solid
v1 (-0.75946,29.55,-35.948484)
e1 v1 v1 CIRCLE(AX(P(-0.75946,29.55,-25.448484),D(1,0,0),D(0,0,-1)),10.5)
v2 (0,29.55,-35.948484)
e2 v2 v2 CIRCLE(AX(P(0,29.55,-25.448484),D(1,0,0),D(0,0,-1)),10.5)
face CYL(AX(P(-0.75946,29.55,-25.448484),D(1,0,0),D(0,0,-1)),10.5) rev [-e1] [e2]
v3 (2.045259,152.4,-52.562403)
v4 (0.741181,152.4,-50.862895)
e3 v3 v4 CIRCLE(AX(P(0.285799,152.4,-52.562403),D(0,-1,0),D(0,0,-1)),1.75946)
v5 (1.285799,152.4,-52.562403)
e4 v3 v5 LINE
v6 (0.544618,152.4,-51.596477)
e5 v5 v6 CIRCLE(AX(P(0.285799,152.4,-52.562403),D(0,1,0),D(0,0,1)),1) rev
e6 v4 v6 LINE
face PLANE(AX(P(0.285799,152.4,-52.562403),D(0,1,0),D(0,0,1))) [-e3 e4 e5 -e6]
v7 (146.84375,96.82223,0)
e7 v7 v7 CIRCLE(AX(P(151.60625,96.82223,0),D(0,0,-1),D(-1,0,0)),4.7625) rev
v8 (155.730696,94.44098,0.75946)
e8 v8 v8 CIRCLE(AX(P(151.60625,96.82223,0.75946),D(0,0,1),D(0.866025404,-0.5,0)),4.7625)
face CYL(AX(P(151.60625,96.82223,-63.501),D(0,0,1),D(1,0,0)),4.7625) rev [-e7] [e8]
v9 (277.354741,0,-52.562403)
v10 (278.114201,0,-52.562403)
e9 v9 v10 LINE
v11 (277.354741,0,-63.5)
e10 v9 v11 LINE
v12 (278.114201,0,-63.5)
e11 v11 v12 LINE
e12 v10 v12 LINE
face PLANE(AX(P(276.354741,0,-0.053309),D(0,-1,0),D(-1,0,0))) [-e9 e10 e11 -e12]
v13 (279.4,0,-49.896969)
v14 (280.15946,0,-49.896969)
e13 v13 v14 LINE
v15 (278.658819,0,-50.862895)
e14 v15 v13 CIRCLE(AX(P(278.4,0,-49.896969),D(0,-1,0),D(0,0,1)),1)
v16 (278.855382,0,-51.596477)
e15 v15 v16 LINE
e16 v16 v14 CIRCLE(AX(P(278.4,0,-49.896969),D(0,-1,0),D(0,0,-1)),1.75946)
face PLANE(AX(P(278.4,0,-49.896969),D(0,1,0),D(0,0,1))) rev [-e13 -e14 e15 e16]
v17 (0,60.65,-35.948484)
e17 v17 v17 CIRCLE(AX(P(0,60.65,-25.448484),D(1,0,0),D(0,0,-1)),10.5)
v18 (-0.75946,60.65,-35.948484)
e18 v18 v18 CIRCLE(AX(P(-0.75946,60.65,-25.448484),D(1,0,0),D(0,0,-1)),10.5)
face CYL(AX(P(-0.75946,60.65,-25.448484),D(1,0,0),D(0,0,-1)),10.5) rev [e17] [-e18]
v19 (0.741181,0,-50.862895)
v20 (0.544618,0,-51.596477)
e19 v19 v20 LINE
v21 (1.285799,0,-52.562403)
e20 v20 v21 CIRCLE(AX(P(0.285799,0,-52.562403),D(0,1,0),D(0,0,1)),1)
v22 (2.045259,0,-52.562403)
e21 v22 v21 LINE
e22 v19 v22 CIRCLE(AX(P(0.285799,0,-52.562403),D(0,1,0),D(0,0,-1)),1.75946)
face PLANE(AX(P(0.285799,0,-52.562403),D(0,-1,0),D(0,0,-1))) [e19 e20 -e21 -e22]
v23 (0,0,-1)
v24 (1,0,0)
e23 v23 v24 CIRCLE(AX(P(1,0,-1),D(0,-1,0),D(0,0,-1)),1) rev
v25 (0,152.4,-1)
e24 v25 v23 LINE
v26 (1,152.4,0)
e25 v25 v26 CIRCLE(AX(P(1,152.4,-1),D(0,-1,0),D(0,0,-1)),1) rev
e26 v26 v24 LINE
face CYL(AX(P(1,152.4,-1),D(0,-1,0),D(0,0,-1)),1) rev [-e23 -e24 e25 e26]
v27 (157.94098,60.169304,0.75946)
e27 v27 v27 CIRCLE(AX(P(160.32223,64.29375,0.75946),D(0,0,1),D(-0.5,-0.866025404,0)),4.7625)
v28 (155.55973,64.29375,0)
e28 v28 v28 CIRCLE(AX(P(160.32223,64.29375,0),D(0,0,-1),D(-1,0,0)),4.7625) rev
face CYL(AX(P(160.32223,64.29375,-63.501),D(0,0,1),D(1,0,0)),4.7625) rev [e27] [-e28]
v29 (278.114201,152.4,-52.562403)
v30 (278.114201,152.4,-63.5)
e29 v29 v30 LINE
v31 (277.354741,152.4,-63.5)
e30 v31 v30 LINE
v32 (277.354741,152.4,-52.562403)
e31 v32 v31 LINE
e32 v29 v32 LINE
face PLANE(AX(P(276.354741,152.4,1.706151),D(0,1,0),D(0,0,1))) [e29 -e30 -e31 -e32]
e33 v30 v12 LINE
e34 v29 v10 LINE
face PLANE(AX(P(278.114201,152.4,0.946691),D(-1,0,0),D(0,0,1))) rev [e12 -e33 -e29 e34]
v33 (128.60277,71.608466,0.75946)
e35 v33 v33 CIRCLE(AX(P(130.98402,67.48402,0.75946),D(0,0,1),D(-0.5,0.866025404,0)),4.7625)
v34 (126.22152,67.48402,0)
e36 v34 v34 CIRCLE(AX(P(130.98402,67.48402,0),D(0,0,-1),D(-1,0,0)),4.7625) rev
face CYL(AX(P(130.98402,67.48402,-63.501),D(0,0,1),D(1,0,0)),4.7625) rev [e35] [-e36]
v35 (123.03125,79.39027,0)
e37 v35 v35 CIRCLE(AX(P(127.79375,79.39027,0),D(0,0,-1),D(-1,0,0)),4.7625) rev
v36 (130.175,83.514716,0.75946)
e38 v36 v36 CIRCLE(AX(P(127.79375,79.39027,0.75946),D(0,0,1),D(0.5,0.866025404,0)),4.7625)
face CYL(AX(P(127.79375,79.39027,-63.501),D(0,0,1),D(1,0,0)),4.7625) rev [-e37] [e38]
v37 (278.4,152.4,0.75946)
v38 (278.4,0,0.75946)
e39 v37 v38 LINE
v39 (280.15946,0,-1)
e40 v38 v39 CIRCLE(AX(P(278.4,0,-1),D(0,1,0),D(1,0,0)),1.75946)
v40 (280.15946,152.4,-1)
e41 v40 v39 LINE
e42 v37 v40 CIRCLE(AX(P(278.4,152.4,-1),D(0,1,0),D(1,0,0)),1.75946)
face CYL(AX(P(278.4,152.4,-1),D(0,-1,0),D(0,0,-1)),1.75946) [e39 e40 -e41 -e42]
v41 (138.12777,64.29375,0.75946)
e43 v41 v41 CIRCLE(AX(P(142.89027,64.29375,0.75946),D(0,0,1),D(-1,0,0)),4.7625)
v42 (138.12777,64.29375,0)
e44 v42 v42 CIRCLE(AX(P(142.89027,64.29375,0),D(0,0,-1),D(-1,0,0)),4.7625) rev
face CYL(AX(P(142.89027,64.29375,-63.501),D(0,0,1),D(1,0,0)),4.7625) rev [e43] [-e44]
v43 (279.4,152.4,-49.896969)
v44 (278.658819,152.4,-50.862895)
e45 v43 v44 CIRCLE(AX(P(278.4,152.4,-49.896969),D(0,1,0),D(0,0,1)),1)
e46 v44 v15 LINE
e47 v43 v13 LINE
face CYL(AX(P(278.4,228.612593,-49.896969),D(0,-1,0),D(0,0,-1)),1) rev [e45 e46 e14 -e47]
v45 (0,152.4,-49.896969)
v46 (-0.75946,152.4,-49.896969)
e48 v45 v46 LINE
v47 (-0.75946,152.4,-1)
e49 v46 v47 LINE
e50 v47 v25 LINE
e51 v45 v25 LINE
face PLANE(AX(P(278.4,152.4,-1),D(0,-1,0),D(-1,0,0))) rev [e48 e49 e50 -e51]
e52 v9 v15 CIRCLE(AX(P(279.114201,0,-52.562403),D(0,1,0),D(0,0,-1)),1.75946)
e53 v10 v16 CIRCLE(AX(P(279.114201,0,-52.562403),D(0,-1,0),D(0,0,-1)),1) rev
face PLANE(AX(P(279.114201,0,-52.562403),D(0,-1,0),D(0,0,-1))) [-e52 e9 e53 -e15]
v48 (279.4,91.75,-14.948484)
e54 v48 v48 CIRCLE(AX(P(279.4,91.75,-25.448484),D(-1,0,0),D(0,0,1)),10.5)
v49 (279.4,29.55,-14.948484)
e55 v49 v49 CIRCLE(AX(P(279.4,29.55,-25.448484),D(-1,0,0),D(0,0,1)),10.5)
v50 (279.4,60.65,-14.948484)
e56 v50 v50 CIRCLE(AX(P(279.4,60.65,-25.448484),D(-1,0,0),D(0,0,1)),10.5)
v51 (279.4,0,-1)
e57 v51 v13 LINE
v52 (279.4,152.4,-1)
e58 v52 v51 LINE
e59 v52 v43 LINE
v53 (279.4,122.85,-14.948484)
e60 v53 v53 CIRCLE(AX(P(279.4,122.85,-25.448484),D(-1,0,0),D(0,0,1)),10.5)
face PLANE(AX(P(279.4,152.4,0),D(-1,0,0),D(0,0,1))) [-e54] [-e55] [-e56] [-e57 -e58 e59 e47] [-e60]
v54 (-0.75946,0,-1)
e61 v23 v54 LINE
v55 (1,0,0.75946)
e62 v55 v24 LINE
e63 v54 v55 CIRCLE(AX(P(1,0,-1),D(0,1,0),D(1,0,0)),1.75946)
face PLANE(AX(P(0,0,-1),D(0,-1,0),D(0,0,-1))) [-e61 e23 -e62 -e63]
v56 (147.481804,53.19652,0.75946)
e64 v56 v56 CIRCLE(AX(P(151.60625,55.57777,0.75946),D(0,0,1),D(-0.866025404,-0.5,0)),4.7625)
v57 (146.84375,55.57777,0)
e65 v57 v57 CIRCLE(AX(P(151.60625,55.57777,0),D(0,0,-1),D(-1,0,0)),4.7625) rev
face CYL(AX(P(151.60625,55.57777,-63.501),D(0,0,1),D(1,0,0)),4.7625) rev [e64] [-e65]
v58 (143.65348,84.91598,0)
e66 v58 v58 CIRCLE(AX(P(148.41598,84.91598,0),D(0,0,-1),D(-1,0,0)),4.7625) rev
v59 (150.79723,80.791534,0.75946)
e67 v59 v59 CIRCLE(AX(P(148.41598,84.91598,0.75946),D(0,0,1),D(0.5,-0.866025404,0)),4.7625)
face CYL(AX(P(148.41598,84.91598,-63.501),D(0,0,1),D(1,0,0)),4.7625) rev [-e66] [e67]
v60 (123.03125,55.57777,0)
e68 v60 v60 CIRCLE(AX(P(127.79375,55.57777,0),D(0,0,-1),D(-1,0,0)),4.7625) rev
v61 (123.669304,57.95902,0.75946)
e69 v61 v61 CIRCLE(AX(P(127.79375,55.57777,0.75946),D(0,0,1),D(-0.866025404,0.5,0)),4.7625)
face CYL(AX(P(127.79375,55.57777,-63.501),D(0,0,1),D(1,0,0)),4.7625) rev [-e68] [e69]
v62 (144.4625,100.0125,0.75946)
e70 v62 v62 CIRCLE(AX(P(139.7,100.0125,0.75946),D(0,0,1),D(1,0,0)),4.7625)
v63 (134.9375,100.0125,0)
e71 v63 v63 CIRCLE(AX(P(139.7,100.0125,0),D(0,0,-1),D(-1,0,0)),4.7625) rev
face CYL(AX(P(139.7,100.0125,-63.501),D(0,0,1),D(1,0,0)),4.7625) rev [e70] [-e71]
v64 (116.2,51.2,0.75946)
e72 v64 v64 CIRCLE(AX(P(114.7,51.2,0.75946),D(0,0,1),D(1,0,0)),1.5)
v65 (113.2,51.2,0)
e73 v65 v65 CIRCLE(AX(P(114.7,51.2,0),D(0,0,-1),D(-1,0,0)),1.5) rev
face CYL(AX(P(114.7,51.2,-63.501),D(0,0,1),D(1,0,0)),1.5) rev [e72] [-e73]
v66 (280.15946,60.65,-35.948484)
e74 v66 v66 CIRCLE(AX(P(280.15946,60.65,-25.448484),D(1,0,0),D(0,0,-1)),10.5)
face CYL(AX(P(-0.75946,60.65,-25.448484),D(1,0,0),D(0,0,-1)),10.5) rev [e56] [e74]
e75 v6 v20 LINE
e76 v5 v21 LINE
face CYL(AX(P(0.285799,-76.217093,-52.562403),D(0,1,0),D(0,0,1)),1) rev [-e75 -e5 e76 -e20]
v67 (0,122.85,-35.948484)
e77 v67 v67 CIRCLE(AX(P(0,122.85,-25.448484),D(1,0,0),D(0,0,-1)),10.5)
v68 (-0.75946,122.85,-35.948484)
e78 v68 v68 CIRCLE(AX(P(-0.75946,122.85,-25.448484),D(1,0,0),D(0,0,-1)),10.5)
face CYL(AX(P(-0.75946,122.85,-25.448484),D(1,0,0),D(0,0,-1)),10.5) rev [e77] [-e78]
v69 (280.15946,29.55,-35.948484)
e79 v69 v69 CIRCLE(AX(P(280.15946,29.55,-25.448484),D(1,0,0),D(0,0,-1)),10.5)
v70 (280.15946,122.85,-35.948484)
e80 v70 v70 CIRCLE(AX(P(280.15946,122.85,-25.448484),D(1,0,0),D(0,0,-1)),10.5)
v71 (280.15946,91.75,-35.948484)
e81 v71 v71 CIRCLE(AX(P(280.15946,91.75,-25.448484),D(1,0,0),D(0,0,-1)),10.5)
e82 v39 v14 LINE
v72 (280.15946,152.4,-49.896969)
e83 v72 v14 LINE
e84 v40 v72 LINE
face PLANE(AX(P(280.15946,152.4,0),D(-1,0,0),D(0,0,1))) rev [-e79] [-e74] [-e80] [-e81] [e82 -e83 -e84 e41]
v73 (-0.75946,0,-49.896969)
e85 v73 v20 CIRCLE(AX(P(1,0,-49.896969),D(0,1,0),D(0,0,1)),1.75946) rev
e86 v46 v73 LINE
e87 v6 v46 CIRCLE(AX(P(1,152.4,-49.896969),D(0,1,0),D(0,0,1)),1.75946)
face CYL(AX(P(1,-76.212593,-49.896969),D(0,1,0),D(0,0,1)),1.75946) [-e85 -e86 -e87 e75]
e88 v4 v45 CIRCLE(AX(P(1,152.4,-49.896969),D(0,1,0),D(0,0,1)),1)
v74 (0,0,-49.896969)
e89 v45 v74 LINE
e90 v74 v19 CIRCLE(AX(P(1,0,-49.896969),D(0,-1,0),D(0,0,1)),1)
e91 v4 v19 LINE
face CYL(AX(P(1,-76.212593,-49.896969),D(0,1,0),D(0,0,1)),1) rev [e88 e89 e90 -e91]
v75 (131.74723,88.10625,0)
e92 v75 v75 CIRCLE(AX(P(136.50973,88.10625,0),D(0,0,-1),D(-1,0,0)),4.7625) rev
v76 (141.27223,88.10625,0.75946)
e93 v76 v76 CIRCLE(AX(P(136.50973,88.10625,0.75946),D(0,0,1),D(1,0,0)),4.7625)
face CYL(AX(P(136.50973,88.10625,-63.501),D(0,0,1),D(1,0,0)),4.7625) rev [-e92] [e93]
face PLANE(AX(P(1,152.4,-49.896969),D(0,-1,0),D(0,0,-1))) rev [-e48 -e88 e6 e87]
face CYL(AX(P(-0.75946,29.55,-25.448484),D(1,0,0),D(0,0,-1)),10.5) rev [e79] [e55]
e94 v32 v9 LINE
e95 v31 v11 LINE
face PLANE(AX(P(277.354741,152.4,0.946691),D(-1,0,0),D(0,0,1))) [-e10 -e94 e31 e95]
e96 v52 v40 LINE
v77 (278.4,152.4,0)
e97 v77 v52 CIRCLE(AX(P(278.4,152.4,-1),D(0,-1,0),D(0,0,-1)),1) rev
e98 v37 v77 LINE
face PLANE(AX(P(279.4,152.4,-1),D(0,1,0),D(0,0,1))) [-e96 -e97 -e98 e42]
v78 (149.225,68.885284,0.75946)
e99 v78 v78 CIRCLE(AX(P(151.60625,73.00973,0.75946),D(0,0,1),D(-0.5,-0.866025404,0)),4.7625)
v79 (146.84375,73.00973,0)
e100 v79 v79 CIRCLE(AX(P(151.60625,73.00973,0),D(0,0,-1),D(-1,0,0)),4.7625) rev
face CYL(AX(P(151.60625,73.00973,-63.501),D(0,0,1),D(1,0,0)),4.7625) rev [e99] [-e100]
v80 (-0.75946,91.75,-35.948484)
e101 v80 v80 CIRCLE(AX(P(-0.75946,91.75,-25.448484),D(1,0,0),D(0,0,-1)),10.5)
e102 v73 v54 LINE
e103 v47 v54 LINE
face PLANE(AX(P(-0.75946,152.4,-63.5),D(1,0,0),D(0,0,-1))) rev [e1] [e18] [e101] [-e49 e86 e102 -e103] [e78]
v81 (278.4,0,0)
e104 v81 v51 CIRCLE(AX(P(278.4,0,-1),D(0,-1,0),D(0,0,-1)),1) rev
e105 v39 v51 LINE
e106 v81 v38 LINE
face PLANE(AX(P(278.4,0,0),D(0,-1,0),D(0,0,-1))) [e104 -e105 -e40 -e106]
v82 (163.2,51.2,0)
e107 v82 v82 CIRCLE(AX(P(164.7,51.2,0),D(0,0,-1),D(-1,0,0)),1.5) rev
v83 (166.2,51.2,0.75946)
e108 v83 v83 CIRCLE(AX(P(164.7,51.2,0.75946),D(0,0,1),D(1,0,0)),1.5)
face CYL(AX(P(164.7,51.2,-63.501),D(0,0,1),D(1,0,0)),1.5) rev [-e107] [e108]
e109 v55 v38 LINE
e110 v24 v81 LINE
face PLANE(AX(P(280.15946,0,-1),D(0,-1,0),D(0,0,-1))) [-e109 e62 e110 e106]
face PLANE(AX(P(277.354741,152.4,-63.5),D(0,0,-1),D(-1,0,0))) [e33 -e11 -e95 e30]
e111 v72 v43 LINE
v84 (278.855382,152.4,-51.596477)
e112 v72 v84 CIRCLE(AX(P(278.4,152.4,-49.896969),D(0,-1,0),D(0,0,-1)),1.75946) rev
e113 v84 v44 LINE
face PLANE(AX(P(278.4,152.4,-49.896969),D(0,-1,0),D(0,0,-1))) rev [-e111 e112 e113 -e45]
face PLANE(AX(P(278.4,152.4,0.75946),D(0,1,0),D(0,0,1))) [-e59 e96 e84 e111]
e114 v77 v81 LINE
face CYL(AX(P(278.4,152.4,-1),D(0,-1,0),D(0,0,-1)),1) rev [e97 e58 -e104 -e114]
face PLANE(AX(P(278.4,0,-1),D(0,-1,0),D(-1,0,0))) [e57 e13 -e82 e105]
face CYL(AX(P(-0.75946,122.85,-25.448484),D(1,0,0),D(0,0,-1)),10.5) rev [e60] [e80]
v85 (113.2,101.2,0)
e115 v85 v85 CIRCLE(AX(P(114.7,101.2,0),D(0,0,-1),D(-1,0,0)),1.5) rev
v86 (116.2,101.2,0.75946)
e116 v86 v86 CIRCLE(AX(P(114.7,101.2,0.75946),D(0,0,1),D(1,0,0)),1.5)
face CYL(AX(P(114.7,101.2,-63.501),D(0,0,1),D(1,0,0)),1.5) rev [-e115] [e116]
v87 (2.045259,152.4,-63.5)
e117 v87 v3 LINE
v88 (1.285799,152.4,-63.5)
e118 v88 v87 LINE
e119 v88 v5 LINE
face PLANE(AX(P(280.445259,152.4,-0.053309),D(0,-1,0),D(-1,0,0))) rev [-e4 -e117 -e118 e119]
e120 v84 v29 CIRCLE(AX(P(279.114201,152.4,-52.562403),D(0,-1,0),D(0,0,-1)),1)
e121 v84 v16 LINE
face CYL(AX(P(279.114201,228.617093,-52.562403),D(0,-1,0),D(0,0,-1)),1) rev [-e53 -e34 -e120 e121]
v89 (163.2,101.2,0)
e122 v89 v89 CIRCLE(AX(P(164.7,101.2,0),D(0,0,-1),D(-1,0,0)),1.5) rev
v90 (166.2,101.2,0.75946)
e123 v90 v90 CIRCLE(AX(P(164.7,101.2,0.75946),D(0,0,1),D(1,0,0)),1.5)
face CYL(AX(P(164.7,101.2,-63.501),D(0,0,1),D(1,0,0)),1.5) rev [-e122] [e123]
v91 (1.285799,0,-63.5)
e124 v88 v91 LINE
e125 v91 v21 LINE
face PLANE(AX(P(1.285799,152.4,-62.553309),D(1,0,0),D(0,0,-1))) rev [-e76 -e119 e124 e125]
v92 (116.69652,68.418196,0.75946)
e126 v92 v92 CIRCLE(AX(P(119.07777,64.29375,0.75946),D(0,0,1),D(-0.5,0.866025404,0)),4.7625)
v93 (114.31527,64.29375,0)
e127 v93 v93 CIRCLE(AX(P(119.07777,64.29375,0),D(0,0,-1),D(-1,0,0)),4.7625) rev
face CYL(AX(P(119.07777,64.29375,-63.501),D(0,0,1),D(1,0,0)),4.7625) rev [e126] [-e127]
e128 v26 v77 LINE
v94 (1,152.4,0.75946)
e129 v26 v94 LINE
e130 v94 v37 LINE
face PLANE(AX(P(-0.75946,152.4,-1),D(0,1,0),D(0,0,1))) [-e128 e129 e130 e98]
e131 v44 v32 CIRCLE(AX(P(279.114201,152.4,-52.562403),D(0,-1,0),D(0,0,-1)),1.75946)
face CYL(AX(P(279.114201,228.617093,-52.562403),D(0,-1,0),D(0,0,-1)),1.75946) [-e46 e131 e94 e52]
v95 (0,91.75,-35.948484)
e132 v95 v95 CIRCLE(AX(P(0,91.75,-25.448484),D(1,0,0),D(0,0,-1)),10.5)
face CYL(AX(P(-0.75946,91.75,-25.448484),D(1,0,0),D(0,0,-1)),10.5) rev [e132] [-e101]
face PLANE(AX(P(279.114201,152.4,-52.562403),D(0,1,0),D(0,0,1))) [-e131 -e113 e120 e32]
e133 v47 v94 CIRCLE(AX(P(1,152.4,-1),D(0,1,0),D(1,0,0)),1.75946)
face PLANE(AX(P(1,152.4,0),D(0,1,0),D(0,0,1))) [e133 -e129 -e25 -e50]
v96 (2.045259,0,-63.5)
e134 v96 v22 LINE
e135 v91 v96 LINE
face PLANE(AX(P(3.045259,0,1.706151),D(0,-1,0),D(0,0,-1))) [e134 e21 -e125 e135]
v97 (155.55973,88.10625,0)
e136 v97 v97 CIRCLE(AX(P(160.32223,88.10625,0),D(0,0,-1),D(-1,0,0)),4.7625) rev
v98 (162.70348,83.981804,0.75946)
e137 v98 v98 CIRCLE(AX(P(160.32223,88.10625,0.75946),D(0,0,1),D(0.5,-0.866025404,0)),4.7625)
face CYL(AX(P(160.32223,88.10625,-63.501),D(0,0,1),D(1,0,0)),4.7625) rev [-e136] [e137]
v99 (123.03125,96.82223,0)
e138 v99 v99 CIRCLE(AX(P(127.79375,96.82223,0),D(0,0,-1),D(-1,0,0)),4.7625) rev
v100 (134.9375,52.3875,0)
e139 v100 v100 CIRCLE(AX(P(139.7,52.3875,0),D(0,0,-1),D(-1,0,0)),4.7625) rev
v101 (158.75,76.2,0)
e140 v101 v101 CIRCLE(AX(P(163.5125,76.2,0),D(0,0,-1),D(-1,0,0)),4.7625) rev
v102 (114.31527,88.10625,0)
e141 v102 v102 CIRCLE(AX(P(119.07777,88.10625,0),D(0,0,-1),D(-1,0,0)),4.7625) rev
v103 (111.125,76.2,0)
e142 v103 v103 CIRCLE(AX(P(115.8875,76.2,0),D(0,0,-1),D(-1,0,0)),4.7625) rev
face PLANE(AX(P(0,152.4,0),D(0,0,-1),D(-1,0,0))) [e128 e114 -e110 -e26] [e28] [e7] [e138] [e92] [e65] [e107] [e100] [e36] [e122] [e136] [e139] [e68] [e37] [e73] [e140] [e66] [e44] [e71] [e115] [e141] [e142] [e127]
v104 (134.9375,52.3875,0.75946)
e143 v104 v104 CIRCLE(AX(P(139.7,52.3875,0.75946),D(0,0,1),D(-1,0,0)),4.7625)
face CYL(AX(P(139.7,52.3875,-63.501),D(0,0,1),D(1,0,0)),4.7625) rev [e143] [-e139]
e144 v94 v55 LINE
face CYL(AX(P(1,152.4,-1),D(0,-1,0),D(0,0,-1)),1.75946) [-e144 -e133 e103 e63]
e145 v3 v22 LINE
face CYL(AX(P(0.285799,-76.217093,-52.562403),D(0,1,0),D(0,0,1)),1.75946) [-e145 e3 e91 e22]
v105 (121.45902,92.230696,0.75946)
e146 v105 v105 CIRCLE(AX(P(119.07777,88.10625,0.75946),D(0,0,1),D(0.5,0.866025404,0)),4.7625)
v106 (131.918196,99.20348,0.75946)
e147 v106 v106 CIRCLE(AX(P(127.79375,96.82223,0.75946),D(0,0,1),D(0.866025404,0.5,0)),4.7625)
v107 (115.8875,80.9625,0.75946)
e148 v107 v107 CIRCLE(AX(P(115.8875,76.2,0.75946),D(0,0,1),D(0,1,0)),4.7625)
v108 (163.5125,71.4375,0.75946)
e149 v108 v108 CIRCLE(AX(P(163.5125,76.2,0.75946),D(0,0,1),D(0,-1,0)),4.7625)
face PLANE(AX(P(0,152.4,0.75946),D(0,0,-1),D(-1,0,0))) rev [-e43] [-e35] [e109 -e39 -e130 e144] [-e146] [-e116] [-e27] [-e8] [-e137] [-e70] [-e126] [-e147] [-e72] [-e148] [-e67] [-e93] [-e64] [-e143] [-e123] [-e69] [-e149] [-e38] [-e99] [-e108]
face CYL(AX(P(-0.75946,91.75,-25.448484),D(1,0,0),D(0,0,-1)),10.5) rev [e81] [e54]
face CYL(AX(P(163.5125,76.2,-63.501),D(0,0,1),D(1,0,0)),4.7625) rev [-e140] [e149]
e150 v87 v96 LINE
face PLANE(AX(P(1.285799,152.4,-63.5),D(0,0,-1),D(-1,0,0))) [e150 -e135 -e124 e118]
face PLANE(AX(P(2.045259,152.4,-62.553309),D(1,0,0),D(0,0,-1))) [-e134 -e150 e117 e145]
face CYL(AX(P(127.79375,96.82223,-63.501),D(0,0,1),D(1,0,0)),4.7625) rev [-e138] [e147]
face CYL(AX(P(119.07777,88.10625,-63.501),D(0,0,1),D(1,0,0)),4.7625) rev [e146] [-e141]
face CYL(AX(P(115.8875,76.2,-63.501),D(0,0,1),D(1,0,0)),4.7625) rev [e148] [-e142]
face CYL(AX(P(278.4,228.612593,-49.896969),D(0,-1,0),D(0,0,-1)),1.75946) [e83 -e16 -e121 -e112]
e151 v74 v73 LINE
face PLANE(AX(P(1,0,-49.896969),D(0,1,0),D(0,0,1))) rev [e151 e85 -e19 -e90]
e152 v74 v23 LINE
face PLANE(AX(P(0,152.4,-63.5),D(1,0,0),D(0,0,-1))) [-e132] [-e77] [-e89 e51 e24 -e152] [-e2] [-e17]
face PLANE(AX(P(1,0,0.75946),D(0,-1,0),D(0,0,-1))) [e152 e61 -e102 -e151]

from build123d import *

# Parameters (mm, degrees)
BASE_FLANGE1_DEPTH = 152.4
JOG1_DEPTH         = 152.4
JOG1_2_DEPTH       = 152.4
JOG2_DEPTH         = 152.4
JOG2_2_DEPTH       = 152.4
SKETCH6_R          = 10.5
CUT_EXTRUDE1_DEPTH = 326.842676171
CUT_EXTRUDE4_REACH = 327.337
SKETCH8_R          = 4.7625
CIRPATTERN1_COUNT  = 12
CUT_EXTRUDE5_REACH = 327.337
SKETCH9_R          = 4.7625
CIRPATTERN2_COUNT  = 6
CUT_EXTRUDE6_REACH = 327.337
SKETCH10_R         = 1.5


# Read off the part's stored shape, not the designer's step: Jog1, Jog2
# Sheet-metal steps are written as plain solids
with BuildPart() as part:
    # Sketch1 → Base-Flange1 (new body)
    with BuildSketch(Plane(origin=(0, 0, 0), x_dir=(1, 0, 0), z_dir=(0, 1, 0))):
        with BuildLine():
            Line((0, 63.5), (0, 1))
            ThreePointArc((0, 1), (0.292893219, 0.292893219), (1, 0))
            Line((1, 0), (278.4, 0))
            ThreePointArc((278.4, 0), (279.107106781, 0.292893219), (279.4, 1))
            Line((279.4, 1), (279.4, 63.5))
            Line((279.4, 63.5), (280.15946, 63.5))
            Line((280.15946, 63.5), (280.15946, 1))
            ThreePointArc((280.15946, 1), (279.644126097, -0.244126097), (278.4, -0.75946))
            Line((278.4, -0.75946), (1, -0.75946))
            ThreePointArc((1, -0.75946), (-0.244126097, -0.244126097), (-0.75946, 1))
            Line((-0.75946, 1), (-0.75946, 63.5))
            Line((-0.75946, 63.5), (0, 63.5))
        make_face()
    extrude(amount=BASE_FLANGE1_DEPTH)

    # Jog1 outline → Jog1 (cut)
    with BuildSketch(Plane(origin=(0, 0, 0), x_dir=(1, 0, 0), z_dir=(0, 1, 0))):
        with BuildLine():
            Line((279.4, 63.5), (279.4, 51.344621925))
            ThreePointArc((279.4, 51.344621925), (279.958069237, 50.714354749), (280.15946, 49.896968827))
            Line((280.15946, 49.896968827), (280.15946, 63.5))
            Line((280.15946, 63.5), (279.4, 63.5))
        make_face()
    extrude(amount=JOG1_DEPTH, mode=Mode.SUBTRACT)

    # Jog1 2 outline → Jog1 2 (add)
    with BuildSketch(Plane(origin=(0, 0, 0), x_dir=(1, 0, 0), z_dir=(0, 1, 0))):
        with BuildLine():
            Line((278.114200802, 52.562402507), (278.114200802, 63.5))
            Line((278.114200802, 63.5), (277.354740802, 63.5))
            Line((277.354740802, 63.5), (277.354740802, 52.562402507))
            ThreePointArc((277.354740802, 52.562402507), (277.718327334, 51.491311123), (278.658819045, 50.862894653))
            ThreePointArc((278.658819045, 50.862894653), (279.19335334, 50.505730256), (279.4, 49.896968827))
            Line((279.4, 49.896968827), (279.4, 51.344621925))
            ThreePointArc((279.4, 51.344621925), (279.138506411, 51.493937133), (278.855381757, 51.596476681))
            ThreePointArc((278.855381757, 51.596476681), (278.320847462, 51.953641078), (278.114200802, 52.562402507))
        make_face()
    extrude(amount=JOG1_2_DEPTH)

    # Jog2 outline → Jog2 (cut)
    with BuildSketch(Plane(origin=(0, 0, 0), x_dir=(1, 0, 0), z_dir=(0, 1, 0))):
        with BuildLine():
            ThreePointArc((-0.75946, 49.896968827), (-0.558069237, 50.714354749), (0, 51.344621925))
            Line((0, 51.344621925), (0, 63.5))
            Line((0, 63.5), (-0.75946, 63.5))
            Line((-0.75946, 63.5), (-0.75946, 49.896968827))
        make_face()
    extrude(amount=JOG2_DEPTH, mode=Mode.SUBTRACT)

    # Jog2 2 outline → Jog2 2 (add)
    with BuildSketch(Plane(origin=(0, 0, 0), x_dir=(1, 0, 0), z_dir=(0, 1, 0))):
        with BuildLine():
            Line((2.045259198, 52.562402507), (2.045259198, 63.5))
            Line((2.045259198, 63.5), (1.285799198, 63.5))
            Line((1.285799198, 63.5), (1.285799198, 52.562402507))
            ThreePointArc((1.285799198, 52.562402507), (1.079152538, 51.953641078), (0.544618243, 51.596476681))
            ThreePointArc((0.544618243, 51.596476681), (0.261493589, 51.493937133), (0, 51.344621925))
            Line((0, 51.344621925), (0, 49.896968827))
            ThreePointArc((0, 49.896968827), (0.20664666, 50.505730256), (0.741180955, 50.862894653))
            ThreePointArc((0.741180955, 50.862894653), (1.681672666, 51.491311123), (2.045259198, 52.562402507))
        make_face()
    extrude(amount=JOG2_2_DEPTH)

    # Sketch6 → Cut-Extrude1 (cut, through all)
    with BuildSketch(Plane(origin=(280.15946, 0, 0), x_dir=(0, 0, -1), z_dir=(1, 0, 0))):
        with Locations((25.448484413, 122.85)):
            Circle(SKETCH6_R)
        with Locations((25.448484413, 91.75)):
            Circle(SKETCH6_R)
        with Locations((25.448484413, 60.65)):
            Circle(SKETCH6_R)
        with Locations((25.448484413, 29.55)):
            Circle(SKETCH6_R)
    extrude(amount=-CUT_EXTRUDE1_DEPTH, mode=Mode.SUBTRACT)

    # Sketch8 → Cut-Extrude4 (cut, up to next)
    with BuildSketch(Plane.XY.offset(0.75946), mode=Mode.PRIVATE) as cut_extrude4_sk1:
        with Locations((139.7, 100.0125)):
            Circle(SKETCH8_R)
    cut_extrude4_tool1 = extrude(cut_extrude4_sk1.sketch, amount=-CUT_EXTRUDE4_REACH, mode=Mode.PRIVATE) & part.part
    cut_extrude4 = cut_extrude4_tool1.solids().sort_by_distance((139.7, 100.0125, 0.75946))[0]
    add(cut_extrude4, mode=Mode.SUBTRACT)

    # CirPattern1: Cut-Extrude4 ×12 about axis
    cirpattern1_axis = Axis((139.7, 76.2, 0), (0, 0, 1))
    for i in range(1, CIRPATTERN1_COUNT):
        add(cut_extrude4.rotate(cirpattern1_axis, i * 360 / CIRPATTERN1_COUNT), mode=Mode.SUBTRACT)

    # Sketch9 → Cut-Extrude5 (cut, up to next)
    with BuildSketch(Plane.XY.offset(0.75946), mode=Mode.PRIVATE) as cut_extrude5_sk1:
        with Locations((136.509729928, 88.10625)):
            Circle(SKETCH9_R)
    cut_extrude5_tool1 = extrude(cut_extrude5_sk1.sketch, amount=-CUT_EXTRUDE5_REACH, mode=Mode.PRIVATE) & part.part
    cut_extrude5 = cut_extrude5_tool1.solids().sort_by_distance((136.50973, 88.10625, 0.75946))[0]
    add(cut_extrude5, mode=Mode.SUBTRACT)

    # CirPattern2: Cut-Extrude5 ×6 about axis
    cirpattern2_axis = Axis((139.7, 76.2, 0), (0, 0, 1))
    for i in range(1, CIRPATTERN2_COUNT):
        add(cut_extrude5.rotate(cirpattern2_axis, i * 360 / CIRPATTERN2_COUNT), mode=Mode.SUBTRACT)

    # Sketch10 → Cut-Extrude6 (cut, up to next)
    with BuildSketch(Plane.XY.offset(0.75946), mode=Mode.PRIVATE) as cut_extrude6_sk1:
        with Locations((114.7, 51.2)):
            Circle(SKETCH10_R)
    cut_extrude6_tool1 = extrude(cut_extrude6_sk1.sketch, amount=-CUT_EXTRUDE6_REACH, mode=Mode.PRIVATE) & part.part
    # Sketch10 → Cut-Extrude6 (cut, up to next)
    with BuildSketch(Plane.XY.offset(0.75946), mode=Mode.PRIVATE) as cut_extrude6_sk2:
        with Locations((114.7, 101.2)):
            Circle(SKETCH10_R)
    cut_extrude6_tool2 = extrude(cut_extrude6_sk2.sketch, amount=-CUT_EXTRUDE6_REACH, mode=Mode.PRIVATE) & part.part
    # Sketch10 → Cut-Extrude6 (cut, up to next)
    with BuildSketch(Plane.XY.offset(0.75946), mode=Mode.PRIVATE) as cut_extrude6_sk3:
        with Locations((164.7, 101.2)):
            Circle(SKETCH10_R)
    cut_extrude6_tool3 = extrude(cut_extrude6_sk3.sketch, amount=-CUT_EXTRUDE6_REACH, mode=Mode.PRIVATE) & part.part
    # Sketch10 → Cut-Extrude6 (cut, up to next)
    with BuildSketch(Plane.XY.offset(0.75946), mode=Mode.PRIVATE) as cut_extrude6_sk4:
        with Locations((164.7, 51.2)):
            Circle(SKETCH10_R)
    cut_extrude6_tool4 = extrude(cut_extrude6_sk4.sketch, amount=-CUT_EXTRUDE6_REACH, mode=Mode.PRIVATE) & part.part
    add(cut_extrude6_tool1.solids().sort_by_distance((114.7, 51.2, 0.75946))[0], mode=Mode.SUBTRACT)
    add(cut_extrude6_tool2.solids().sort_by_distance((114.7, 101.2, 0.75946))[0], mode=Mode.SUBTRACT)
    add(cut_extrude6_tool3.solids().sort_by_distance((164.7, 101.2, 0.75946))[0], mode=Mode.SUBTRACT)
    add(cut_extrude6_tool4.solids().sort_by_distance((164.7, 51.2, 0.75946))[0], mode=Mode.SUBTRACT)


solid = part.part
